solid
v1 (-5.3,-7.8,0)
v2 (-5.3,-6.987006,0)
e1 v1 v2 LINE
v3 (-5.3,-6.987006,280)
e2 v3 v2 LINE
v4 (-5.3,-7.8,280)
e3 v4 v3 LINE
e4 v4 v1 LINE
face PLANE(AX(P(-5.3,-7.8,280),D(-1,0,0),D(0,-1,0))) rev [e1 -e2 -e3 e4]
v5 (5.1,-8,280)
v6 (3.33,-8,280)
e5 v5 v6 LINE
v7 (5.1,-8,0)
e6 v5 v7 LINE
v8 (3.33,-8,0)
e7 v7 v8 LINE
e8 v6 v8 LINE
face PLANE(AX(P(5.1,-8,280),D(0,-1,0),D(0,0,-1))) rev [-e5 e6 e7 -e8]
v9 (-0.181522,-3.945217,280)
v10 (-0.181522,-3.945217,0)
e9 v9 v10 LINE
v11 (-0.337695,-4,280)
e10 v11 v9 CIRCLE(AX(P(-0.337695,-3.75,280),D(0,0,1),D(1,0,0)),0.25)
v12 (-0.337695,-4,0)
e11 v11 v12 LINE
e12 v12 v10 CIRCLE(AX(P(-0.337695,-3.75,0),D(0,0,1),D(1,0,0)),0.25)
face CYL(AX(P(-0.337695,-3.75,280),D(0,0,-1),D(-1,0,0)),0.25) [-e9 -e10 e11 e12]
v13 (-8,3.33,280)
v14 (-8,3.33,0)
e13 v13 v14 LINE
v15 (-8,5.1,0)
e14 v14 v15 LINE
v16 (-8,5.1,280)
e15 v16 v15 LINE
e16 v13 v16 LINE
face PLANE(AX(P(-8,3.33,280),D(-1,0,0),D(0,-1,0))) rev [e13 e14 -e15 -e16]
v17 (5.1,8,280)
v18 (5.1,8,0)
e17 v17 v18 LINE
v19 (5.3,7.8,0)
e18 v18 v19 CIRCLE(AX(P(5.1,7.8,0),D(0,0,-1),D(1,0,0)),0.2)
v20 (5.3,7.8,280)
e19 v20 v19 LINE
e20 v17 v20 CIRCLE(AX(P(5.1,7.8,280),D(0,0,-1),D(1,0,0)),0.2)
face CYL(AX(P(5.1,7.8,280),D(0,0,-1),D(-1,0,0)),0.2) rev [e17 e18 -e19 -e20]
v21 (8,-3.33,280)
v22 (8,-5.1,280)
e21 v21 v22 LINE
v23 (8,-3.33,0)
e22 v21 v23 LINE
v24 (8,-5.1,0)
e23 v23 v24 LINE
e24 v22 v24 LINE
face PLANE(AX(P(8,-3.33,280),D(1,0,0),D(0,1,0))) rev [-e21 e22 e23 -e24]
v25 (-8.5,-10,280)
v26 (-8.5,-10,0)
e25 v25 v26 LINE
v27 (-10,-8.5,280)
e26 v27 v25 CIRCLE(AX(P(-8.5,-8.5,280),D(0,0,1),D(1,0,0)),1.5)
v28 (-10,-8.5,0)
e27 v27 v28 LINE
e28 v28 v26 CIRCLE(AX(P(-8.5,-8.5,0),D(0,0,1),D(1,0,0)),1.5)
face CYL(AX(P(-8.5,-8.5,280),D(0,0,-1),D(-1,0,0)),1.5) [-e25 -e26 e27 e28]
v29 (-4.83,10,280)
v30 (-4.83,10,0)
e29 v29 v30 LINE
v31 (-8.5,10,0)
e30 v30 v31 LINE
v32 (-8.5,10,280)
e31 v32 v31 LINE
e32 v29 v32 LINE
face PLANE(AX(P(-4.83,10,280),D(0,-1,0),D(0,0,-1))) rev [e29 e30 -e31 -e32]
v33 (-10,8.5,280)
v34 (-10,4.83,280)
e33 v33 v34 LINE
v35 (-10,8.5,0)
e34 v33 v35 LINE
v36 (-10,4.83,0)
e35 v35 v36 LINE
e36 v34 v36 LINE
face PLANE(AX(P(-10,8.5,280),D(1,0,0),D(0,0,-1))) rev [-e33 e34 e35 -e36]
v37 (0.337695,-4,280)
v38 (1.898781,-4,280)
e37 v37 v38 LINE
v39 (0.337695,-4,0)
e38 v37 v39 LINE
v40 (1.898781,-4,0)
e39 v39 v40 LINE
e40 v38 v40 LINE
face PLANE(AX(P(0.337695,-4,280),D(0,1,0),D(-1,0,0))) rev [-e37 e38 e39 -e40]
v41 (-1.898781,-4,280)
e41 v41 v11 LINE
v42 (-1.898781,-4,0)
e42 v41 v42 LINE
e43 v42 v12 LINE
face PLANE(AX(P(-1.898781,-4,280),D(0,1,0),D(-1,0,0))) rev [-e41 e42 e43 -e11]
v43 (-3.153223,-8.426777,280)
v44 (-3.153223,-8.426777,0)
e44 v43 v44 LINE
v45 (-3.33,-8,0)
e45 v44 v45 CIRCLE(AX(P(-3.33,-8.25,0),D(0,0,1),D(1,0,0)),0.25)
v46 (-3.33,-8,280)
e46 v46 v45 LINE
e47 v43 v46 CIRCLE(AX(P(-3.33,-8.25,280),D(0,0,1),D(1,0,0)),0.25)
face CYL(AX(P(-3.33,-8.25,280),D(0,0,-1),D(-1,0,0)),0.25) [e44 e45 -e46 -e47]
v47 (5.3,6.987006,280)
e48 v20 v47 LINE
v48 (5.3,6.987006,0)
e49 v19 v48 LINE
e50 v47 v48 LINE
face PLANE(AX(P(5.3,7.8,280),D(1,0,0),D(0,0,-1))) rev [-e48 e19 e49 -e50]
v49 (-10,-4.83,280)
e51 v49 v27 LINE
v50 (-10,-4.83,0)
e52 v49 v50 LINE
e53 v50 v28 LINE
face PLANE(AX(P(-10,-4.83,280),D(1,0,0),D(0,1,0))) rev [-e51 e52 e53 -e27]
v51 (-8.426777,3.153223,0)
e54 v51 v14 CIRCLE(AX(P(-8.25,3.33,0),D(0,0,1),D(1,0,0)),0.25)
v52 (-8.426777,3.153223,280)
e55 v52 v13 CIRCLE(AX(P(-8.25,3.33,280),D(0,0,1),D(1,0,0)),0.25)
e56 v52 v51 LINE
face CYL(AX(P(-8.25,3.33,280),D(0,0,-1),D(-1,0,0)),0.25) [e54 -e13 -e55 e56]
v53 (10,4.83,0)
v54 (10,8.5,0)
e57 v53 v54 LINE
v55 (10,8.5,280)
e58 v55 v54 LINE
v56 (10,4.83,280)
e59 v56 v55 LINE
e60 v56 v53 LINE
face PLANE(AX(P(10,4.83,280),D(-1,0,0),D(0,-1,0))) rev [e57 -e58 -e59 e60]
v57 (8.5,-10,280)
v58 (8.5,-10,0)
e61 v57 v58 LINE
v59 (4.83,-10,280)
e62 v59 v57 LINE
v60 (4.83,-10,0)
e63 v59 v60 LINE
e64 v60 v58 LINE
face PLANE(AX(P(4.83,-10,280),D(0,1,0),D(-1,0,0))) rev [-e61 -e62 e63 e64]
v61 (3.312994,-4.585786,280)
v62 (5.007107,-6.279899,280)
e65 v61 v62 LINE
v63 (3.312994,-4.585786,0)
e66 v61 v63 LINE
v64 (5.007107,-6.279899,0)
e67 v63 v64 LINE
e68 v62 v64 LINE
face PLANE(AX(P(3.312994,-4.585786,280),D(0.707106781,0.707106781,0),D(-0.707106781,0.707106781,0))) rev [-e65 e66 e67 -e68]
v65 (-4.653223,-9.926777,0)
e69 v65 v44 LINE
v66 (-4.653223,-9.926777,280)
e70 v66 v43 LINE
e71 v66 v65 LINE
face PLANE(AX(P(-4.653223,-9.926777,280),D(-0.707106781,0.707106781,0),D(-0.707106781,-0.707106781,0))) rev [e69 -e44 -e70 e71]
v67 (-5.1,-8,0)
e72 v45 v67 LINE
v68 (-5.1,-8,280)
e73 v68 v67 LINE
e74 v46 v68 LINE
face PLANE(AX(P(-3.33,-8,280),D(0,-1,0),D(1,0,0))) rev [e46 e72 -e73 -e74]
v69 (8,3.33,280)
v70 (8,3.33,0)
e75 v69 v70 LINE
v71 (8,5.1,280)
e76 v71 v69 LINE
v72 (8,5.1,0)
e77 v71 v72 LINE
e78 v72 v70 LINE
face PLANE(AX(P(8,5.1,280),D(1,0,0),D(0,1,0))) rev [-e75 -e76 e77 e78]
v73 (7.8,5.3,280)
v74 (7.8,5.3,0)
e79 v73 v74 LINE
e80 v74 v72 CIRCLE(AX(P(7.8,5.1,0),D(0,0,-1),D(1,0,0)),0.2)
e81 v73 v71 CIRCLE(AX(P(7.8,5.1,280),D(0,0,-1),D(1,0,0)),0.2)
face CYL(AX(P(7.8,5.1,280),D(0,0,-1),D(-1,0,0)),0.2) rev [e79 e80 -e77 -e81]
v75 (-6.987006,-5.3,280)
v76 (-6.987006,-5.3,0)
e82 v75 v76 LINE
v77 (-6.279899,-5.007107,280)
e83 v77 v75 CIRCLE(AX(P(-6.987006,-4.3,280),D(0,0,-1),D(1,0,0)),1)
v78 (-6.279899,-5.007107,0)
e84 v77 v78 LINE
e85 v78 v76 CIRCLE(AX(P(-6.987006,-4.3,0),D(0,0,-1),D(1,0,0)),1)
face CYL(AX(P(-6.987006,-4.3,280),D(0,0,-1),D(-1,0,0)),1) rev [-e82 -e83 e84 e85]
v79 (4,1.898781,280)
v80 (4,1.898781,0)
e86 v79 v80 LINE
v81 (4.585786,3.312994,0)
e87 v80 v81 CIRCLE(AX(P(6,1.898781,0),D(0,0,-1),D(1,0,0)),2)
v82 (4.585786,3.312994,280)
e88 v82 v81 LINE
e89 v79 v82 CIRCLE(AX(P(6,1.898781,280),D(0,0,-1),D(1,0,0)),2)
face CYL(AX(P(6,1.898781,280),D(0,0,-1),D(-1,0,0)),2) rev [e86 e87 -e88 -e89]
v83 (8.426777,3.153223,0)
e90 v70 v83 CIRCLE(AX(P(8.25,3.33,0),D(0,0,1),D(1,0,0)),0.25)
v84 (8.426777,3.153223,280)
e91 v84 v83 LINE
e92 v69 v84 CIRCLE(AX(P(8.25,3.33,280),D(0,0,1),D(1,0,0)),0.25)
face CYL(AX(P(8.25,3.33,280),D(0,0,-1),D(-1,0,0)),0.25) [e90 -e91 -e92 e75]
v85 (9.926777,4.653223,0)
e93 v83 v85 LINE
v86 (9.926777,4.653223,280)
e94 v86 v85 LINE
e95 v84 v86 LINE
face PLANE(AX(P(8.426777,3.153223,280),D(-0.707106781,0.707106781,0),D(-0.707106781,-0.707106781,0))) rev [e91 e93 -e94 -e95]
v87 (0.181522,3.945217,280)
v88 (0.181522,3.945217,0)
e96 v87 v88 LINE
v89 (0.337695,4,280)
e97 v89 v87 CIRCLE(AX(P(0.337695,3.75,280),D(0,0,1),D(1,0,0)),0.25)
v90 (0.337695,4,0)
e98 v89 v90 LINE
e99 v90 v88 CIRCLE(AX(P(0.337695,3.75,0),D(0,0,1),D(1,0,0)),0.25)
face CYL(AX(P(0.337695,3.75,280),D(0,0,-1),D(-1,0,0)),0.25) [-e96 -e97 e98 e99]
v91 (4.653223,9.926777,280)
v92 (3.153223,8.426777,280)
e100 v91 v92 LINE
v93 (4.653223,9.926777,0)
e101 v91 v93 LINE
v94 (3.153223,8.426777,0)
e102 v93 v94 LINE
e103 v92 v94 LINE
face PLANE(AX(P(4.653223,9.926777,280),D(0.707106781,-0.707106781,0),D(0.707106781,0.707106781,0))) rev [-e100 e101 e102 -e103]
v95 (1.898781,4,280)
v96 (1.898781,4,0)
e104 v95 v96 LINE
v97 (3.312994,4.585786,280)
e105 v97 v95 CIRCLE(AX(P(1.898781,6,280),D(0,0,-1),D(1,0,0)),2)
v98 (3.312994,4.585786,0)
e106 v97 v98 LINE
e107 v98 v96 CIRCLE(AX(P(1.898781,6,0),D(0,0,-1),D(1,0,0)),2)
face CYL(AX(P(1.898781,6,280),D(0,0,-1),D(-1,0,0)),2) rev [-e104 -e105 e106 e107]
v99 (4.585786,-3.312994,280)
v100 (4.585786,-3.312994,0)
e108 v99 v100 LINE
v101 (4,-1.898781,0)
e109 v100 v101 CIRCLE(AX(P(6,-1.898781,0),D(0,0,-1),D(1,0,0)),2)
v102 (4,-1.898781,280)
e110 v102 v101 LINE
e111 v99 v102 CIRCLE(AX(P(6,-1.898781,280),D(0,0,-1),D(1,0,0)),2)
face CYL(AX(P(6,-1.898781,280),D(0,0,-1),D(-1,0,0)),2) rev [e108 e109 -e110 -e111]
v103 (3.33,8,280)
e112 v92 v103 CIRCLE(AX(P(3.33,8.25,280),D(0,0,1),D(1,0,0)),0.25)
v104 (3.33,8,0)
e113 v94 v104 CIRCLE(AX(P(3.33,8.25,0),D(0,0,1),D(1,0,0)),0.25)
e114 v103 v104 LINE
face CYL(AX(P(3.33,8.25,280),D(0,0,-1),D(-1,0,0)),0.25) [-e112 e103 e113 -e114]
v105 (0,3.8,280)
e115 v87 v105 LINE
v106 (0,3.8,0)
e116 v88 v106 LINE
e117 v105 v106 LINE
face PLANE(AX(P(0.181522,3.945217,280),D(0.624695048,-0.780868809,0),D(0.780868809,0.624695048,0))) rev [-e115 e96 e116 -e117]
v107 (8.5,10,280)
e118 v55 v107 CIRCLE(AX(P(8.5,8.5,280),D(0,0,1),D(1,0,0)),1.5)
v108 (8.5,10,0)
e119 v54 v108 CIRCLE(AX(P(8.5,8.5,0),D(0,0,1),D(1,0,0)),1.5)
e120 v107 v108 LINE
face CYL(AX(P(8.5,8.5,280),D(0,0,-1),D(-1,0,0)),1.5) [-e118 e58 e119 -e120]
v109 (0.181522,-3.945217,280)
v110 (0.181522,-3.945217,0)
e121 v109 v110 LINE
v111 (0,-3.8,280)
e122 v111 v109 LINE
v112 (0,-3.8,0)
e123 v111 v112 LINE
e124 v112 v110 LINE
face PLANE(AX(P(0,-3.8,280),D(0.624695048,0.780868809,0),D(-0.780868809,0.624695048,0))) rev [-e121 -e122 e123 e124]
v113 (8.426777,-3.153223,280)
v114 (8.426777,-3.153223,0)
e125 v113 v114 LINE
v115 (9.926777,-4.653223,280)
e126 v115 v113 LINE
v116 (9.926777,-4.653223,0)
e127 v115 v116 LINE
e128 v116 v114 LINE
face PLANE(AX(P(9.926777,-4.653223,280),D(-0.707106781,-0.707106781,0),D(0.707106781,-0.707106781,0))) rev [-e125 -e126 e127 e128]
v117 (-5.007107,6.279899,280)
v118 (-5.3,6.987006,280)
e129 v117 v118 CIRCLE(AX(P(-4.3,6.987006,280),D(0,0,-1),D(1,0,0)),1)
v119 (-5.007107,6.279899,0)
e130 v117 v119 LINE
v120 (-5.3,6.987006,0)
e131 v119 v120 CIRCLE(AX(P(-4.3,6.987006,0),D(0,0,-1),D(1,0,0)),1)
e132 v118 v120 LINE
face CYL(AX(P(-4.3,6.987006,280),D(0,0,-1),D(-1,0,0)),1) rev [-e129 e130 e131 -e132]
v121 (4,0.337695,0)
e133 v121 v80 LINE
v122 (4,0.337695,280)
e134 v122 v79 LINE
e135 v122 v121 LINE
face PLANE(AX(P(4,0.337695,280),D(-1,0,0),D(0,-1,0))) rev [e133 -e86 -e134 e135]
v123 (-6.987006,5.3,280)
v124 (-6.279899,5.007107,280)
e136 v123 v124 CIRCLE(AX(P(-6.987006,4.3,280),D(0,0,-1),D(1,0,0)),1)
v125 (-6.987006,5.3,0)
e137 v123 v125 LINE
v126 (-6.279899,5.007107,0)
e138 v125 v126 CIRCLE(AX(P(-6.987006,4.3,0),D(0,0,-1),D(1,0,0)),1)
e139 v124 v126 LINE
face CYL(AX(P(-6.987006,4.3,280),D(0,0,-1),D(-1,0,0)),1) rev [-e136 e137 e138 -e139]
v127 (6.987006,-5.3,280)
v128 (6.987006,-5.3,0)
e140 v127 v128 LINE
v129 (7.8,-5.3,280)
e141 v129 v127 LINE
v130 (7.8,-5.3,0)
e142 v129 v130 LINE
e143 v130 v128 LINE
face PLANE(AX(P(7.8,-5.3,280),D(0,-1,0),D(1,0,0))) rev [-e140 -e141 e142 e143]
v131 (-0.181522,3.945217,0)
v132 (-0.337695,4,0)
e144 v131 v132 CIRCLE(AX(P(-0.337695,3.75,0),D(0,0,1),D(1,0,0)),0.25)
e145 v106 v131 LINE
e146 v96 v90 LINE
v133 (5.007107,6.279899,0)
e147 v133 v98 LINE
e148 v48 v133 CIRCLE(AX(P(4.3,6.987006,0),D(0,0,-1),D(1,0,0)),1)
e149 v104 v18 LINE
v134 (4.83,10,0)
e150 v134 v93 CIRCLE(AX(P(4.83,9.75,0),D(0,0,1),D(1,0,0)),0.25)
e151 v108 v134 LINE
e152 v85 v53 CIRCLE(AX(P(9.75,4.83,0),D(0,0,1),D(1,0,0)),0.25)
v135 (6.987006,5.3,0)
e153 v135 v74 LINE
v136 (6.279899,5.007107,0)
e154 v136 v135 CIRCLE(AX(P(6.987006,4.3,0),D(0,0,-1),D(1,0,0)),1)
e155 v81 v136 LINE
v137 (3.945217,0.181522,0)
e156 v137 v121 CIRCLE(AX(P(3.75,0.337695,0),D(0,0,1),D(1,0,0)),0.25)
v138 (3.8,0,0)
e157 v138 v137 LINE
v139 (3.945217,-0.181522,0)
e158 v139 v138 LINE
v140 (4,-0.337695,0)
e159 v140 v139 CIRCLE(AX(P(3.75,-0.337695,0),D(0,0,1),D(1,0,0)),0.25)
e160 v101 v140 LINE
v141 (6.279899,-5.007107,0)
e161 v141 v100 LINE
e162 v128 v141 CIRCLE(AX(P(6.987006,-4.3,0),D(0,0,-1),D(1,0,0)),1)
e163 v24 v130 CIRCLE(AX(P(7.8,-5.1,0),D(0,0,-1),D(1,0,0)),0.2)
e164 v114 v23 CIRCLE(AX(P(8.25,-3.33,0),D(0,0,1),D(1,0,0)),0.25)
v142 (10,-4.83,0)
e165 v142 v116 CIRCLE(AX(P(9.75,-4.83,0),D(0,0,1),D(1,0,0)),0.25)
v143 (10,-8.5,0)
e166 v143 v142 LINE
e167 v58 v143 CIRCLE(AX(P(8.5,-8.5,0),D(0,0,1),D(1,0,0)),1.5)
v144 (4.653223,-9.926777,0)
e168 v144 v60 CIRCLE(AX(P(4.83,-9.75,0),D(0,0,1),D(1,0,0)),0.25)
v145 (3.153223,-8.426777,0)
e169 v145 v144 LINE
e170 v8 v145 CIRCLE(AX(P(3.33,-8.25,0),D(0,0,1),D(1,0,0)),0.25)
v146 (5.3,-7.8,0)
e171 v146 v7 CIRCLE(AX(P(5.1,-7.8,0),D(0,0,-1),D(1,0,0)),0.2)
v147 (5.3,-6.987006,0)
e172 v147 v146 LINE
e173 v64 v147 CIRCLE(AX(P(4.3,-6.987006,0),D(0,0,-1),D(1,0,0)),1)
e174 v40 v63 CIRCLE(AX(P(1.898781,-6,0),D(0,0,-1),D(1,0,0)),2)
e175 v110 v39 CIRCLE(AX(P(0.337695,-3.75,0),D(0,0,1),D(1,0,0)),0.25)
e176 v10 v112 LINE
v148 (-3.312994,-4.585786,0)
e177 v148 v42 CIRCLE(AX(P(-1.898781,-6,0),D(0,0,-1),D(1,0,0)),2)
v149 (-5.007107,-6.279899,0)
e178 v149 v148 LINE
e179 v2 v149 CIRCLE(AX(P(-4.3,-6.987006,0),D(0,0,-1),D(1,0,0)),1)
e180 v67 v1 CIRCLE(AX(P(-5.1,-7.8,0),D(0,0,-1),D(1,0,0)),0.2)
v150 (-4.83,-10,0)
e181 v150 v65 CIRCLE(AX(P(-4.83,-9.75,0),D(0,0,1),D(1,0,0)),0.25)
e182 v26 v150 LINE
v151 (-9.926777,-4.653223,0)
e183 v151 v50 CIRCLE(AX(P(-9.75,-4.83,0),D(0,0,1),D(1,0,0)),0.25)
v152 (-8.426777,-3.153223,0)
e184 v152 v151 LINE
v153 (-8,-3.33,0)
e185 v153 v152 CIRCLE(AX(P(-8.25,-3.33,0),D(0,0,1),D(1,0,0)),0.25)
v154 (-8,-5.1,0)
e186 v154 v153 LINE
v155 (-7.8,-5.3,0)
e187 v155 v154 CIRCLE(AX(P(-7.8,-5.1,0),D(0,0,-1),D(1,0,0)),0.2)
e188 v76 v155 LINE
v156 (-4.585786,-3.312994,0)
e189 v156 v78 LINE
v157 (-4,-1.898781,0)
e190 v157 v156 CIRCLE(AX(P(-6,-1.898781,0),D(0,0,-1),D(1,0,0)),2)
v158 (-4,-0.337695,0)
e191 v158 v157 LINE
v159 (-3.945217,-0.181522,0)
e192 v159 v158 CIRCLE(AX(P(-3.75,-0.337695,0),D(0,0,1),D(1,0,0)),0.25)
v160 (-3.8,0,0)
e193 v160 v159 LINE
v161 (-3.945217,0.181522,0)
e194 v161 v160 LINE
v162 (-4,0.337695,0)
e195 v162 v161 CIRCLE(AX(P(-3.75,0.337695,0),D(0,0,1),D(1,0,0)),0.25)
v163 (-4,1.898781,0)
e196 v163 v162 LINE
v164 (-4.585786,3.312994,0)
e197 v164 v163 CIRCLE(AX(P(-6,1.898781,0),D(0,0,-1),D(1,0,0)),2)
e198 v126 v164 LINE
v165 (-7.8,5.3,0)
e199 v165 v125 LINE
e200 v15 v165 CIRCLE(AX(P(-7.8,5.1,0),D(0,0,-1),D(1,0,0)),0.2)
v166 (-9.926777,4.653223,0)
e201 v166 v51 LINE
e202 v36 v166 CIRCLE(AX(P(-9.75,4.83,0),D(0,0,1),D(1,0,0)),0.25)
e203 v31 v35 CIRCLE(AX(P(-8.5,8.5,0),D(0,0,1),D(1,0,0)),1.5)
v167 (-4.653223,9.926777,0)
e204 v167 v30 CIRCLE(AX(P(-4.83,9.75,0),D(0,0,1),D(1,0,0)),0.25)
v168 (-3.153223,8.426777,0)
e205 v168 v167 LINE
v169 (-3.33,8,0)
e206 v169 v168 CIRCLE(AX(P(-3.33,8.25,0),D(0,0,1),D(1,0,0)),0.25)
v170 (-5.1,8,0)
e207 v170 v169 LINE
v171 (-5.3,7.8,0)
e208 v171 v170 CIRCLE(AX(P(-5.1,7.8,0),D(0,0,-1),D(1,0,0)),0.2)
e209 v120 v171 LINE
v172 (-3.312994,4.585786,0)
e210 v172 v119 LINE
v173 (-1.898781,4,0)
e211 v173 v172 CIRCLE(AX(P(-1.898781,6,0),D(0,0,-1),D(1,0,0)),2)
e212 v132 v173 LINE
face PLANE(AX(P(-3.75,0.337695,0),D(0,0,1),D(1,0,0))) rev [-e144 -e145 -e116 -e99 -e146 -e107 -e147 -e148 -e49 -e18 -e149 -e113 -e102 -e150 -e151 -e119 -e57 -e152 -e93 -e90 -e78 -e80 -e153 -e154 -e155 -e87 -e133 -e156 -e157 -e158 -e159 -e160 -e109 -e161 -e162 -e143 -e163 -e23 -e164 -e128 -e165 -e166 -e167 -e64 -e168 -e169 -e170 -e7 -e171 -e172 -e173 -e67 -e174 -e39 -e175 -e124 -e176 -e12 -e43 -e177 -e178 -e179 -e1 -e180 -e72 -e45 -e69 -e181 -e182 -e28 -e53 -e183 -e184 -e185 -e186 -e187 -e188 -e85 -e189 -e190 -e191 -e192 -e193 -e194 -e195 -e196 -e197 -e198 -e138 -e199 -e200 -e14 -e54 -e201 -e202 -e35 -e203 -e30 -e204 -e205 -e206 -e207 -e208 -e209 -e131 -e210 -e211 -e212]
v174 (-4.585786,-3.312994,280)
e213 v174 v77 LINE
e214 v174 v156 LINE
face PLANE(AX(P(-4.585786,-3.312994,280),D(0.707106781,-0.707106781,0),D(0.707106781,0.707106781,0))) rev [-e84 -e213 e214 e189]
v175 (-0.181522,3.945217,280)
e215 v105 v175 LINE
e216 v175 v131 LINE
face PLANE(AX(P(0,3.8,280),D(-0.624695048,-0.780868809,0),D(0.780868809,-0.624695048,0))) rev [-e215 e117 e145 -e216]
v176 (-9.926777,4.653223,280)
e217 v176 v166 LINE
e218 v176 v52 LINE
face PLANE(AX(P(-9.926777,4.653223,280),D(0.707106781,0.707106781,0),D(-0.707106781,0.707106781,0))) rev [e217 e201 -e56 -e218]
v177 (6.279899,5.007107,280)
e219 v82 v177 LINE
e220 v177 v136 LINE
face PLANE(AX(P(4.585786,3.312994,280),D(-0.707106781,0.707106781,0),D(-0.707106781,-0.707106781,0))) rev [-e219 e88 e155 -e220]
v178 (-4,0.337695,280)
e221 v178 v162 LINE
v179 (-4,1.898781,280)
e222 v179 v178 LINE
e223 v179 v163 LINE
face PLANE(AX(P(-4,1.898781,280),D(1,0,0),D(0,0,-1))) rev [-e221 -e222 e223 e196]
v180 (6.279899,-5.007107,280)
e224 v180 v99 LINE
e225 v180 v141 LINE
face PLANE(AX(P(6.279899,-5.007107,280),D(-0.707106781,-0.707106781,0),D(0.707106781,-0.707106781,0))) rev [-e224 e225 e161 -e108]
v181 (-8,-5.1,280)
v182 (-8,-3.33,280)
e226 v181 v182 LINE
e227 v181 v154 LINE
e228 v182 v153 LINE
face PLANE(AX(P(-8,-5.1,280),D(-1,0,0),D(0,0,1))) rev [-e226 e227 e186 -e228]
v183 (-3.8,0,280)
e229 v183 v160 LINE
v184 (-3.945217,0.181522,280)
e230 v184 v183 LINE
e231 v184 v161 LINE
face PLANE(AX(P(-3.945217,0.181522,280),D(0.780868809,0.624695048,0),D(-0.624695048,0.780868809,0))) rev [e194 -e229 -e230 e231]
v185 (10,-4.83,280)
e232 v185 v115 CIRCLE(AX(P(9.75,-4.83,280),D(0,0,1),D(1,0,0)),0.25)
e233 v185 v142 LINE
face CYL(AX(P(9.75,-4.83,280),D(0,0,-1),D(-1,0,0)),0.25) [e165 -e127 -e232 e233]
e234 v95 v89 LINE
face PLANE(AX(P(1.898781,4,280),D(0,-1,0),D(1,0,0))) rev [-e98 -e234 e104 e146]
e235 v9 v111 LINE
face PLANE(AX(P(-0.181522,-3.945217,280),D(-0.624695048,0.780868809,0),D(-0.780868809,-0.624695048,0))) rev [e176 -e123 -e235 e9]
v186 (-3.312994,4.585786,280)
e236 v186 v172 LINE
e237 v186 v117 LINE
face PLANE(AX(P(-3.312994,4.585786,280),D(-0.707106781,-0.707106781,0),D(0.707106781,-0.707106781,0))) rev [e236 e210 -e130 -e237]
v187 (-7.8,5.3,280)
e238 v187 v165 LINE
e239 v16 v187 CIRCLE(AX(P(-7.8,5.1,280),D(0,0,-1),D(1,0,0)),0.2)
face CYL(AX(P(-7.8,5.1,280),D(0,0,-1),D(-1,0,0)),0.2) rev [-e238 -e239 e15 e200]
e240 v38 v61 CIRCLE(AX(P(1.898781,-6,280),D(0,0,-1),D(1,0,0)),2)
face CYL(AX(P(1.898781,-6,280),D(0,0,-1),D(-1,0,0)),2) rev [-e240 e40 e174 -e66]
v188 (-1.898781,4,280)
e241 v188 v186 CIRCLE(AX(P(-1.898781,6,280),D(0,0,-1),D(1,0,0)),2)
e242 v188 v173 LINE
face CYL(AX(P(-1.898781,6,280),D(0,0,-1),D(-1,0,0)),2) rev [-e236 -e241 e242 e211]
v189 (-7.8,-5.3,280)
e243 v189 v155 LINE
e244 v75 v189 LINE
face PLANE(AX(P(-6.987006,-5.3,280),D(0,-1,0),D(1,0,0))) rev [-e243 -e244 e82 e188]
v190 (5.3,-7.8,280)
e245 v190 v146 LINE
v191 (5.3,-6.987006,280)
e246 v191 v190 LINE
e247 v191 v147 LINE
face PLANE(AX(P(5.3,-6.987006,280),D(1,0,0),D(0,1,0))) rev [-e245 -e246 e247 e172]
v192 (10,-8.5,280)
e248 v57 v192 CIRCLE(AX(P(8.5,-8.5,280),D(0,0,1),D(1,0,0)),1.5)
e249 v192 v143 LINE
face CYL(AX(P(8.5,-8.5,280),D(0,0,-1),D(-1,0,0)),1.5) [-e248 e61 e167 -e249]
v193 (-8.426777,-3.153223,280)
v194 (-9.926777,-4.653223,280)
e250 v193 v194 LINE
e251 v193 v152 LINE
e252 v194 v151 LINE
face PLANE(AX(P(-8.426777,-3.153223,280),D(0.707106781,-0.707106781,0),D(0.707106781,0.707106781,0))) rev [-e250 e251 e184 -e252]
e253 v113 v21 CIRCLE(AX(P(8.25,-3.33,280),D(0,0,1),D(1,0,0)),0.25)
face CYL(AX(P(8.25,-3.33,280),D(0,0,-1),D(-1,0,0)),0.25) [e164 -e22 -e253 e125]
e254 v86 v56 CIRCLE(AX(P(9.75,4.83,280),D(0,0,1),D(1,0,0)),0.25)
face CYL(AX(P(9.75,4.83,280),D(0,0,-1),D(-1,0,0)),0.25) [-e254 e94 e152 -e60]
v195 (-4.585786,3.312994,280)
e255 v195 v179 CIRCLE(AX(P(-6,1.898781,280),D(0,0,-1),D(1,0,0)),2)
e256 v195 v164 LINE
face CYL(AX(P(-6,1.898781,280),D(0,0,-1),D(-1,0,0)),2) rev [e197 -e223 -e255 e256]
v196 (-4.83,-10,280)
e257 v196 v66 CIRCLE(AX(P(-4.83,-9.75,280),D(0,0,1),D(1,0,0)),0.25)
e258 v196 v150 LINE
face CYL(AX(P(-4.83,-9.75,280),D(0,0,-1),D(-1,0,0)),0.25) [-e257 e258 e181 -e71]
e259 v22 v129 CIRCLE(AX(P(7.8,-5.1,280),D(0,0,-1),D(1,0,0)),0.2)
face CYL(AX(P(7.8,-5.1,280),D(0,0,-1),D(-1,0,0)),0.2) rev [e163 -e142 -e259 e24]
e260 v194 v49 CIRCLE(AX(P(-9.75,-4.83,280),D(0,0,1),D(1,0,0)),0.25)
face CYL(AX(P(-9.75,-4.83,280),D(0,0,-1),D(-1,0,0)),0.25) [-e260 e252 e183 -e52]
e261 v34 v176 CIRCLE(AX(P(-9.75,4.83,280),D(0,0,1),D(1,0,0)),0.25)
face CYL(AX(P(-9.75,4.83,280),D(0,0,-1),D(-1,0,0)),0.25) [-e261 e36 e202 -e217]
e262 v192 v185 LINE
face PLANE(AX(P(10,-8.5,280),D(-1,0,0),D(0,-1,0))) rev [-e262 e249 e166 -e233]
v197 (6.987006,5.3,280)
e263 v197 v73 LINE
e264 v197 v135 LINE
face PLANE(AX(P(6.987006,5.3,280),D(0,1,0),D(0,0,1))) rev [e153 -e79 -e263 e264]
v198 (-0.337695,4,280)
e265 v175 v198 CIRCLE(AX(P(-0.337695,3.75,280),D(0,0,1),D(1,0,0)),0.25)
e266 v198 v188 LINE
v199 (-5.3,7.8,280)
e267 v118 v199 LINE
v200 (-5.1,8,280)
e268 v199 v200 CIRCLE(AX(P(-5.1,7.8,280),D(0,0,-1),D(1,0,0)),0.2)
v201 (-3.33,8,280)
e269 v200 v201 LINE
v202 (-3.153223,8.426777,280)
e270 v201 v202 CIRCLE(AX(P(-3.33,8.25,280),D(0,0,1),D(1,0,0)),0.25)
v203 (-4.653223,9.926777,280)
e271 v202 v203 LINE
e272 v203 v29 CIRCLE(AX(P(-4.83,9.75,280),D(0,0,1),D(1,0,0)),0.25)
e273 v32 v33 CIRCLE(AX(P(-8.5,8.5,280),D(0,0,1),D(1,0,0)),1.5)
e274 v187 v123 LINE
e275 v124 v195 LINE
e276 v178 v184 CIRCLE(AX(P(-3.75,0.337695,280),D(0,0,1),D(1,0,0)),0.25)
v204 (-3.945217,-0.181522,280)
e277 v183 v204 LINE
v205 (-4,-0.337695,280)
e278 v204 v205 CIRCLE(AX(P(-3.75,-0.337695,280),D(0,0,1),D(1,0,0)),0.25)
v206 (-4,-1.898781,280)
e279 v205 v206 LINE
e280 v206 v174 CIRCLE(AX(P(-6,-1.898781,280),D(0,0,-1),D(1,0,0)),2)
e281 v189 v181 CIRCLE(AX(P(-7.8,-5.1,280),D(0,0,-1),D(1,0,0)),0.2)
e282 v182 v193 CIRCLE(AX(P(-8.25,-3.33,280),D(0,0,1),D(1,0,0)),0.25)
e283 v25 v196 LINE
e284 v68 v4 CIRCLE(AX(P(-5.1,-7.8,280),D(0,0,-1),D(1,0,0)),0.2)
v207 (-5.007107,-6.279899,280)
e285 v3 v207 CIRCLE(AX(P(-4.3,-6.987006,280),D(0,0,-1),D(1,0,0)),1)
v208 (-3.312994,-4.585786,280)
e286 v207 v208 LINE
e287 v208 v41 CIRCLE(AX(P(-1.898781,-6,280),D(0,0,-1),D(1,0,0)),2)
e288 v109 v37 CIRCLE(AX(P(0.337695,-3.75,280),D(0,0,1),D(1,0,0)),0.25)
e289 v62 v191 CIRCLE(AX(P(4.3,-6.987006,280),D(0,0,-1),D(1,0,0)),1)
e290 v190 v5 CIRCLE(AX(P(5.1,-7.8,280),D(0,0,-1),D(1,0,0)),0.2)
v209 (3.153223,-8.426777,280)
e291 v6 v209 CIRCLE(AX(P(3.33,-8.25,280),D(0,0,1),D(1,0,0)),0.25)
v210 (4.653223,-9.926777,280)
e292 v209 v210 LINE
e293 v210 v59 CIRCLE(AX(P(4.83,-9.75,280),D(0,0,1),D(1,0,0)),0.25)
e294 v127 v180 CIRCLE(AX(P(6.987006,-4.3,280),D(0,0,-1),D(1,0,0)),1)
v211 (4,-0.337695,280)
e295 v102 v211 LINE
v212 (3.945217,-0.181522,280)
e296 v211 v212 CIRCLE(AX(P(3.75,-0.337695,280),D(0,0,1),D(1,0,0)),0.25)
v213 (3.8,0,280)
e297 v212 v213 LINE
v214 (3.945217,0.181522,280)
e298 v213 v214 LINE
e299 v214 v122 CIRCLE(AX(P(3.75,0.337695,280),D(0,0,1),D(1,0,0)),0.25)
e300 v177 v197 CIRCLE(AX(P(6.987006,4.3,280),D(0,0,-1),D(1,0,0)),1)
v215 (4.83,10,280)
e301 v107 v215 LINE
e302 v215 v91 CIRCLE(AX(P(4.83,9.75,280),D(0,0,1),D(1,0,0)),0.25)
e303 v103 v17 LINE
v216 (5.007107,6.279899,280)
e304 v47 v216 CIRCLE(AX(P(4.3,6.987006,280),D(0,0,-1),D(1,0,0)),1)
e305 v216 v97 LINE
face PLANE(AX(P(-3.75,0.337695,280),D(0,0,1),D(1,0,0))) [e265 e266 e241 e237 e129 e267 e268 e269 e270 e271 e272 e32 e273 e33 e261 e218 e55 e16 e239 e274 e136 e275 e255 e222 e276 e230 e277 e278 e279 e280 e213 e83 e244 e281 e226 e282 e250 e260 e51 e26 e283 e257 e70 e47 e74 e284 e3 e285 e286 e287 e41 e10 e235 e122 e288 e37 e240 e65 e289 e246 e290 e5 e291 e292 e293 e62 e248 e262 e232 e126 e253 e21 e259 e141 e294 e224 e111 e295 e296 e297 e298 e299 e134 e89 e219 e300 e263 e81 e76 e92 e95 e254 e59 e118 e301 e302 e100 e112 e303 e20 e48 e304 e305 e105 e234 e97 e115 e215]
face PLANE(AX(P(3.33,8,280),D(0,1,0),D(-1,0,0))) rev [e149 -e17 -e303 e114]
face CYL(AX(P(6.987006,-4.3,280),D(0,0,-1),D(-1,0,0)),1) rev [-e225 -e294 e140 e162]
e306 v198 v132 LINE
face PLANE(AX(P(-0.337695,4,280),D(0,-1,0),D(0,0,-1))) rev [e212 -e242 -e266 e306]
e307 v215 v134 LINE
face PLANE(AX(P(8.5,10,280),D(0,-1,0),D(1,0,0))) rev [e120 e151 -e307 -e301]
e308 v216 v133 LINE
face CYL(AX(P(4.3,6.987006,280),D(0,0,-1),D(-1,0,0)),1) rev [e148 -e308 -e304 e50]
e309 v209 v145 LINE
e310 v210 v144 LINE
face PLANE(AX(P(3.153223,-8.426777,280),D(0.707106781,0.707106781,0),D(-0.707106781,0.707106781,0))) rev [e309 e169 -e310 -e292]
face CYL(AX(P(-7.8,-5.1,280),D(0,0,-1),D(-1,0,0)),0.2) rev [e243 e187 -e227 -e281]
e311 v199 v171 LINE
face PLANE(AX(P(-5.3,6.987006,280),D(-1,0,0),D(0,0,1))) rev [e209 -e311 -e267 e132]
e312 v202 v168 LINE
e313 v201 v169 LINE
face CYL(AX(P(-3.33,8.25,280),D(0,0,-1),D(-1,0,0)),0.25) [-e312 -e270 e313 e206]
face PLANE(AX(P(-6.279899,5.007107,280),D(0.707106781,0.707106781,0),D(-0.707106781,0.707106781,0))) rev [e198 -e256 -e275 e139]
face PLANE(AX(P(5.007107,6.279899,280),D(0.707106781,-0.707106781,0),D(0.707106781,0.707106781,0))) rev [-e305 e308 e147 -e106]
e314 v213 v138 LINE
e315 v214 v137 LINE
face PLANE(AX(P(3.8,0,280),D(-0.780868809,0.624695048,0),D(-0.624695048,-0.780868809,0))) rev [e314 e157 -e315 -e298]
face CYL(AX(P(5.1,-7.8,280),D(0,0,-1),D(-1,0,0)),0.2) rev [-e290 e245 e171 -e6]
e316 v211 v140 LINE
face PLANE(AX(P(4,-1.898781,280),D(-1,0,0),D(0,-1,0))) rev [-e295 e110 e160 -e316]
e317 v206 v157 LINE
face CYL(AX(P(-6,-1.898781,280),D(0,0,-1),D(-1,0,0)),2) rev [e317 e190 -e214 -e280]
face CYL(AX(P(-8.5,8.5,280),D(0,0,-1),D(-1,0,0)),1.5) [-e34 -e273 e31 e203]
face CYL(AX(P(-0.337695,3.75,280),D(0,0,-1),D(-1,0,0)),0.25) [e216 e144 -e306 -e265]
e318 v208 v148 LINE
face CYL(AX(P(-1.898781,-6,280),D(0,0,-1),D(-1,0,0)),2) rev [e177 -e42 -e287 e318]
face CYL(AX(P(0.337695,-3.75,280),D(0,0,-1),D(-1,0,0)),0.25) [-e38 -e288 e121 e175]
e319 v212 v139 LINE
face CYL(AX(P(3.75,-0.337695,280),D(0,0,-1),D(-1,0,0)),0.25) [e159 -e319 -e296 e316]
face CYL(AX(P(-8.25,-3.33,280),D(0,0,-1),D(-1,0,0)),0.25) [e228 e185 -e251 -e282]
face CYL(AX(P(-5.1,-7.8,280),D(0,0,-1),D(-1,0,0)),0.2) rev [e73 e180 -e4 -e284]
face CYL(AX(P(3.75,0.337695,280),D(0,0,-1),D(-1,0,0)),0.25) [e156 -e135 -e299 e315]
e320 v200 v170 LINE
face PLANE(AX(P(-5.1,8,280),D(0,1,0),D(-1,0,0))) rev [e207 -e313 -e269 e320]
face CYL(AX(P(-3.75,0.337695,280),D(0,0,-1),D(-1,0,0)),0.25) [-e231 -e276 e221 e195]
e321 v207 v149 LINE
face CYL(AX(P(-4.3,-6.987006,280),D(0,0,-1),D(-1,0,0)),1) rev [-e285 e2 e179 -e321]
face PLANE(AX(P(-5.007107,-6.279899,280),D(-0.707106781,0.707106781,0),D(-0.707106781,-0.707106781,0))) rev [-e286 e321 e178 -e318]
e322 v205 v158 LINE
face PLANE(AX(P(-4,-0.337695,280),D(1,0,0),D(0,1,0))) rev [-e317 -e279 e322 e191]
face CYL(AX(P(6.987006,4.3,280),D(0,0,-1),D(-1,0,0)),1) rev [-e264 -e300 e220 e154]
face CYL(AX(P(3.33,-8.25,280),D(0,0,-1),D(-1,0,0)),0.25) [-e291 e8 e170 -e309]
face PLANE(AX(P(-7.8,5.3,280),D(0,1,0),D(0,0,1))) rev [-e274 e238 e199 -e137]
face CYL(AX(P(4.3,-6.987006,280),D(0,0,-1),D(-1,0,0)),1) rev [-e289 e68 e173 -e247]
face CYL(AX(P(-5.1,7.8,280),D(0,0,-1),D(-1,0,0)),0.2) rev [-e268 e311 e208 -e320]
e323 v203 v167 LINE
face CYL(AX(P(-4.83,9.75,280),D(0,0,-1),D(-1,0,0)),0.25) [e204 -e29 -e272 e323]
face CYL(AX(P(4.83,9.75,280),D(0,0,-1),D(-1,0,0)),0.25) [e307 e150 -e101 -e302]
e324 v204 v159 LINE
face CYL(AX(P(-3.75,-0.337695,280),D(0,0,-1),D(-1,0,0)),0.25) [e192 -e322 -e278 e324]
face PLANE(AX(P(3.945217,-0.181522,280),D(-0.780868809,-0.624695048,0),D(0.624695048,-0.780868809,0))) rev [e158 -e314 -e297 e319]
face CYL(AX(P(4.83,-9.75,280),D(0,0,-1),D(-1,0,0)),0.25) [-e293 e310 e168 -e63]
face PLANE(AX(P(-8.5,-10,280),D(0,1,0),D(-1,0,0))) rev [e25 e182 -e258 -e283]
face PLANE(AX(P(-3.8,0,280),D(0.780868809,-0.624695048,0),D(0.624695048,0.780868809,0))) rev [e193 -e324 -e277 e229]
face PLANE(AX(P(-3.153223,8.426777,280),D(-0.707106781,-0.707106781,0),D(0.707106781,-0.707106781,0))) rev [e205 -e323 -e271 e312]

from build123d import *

# Parameters (mm, degrees)
EXTRUDE_1_DEPTH = 280


# Read off the part's stored shape, not the designer's step: 222 Конструкционный профиль 20х20-1-surface1
with BuildPart() as part:
    # Эскиз1 → Бобышка-Вытянуть1 (new body)
    with BuildSketch(Plane.XY):
        with BuildLine():
            Line((-3.945217202, 0.181521503), (-3.8, 0))
            Line((-3.8, 0), (-3.945217202, -0.181521503))
            ThreePointArc((-3.945217202, -0.181521503), (-3.98590708, -0.254943529), (-4, -0.337695265))
            Line((-4, -0.337695265), (-4, -1.898780669))
            ThreePointArc((-4, -1.898780669), (-4.152240935, -2.664147534), (-4.585786438, -3.312994231))
            Line((-4.585786438, -3.312994231), (-6.279898987, -5.007106781))
            ThreePointArc((-6.279898987, -5.007106781), (-6.604322336, -5.223879533), (-6.987005769, -5.3))
            Line((-6.987005769, -5.3), (-7.8, -5.3))
            ThreePointArc((-7.8, -5.3), (-7.941421356, -5.241421356), (-8, -5.1))
            Line((-8, -5.1), (-8, -3.33))
            ThreePointArc((-8, -3.33), (-8.154329142, -3.099030117), (-8.426776695, -3.153223305))
            Line((-8.426776695, -3.153223305), (-9.926776695, -4.653223305))
            ThreePointArc((-9.926776695, -4.653223305), (-9.980969883, -4.734329142), (-10, -4.83))
            Line((-10, -4.83), (-10, -8.5))
            ThreePointArc((-10, -8.5), (-9.560660172, -9.560660172), (-8.5, -10))
            Line((-8.5, -10), (-4.83, -10))
            ThreePointArc((-4.83, -10), (-4.734329142, -9.980969883), (-4.653223305, -9.926776695))
            Line((-4.653223305, -9.926776695), (-3.153223305, -8.426776695))
            ThreePointArc((-3.153223305, -8.426776695), (-3.099030117, -8.154329142), (-3.33, -8))
            Line((-3.33, -8), (-5.1, -8))
            ThreePointArc((-5.1, -8), (-5.241421356, -7.941421356), (-5.3, -7.8))
            Line((-5.3, -7.8), (-5.3, -6.987005769))
            ThreePointArc((-5.3, -6.987005769), (-5.223879533, -6.604322336), (-5.007106781, -6.279898987))
            Line((-5.007106781, -6.279898987), (-3.312994231, -4.585786438))
            ThreePointArc((-3.312994231, -4.585786438), (-2.664147534, -4.152240935), (-1.898780669, -4))
            Line((-1.898780669, -4), (-0.337695265, -4))
            ThreePointArc((-0.337695265, -4), (-0.254943529, -3.98590708), (-0.181521503, -3.945217202))
            Line((-0.181521503, -3.945217202), (0, -3.8))
            Line((0, -3.8), (0.181521503, -3.945217202))
            ThreePointArc((0.181521503, -3.945217202), (0.254943529, -3.98590708), (0.337695265, -4))
            Line((0.337695265, -4), (1.898780669, -4))
            ThreePointArc((1.898780669, -4), (2.664147534, -4.152240935), (3.312994231, -4.585786438))
            Line((3.312994231, -4.585786438), (5.007106781, -6.279898987))
            ThreePointArc((5.007106781, -6.279898987), (5.223879533, -6.604322336), (5.3, -6.987005769))
            Line((5.3, -6.987005769), (5.3, -7.8))
            ThreePointArc((5.3, -7.8), (5.241421356, -7.941421356), (5.1, -8))
            Line((5.1, -8), (3.33, -8))
            ThreePointArc((3.33, -8), (3.099030117, -8.154329142), (3.153223305, -8.426776695))
            Line((3.153223305, -8.426776695), (4.653223305, -9.926776695))
            ThreePointArc((4.653223305, -9.926776695), (4.734329142, -9.980969883), (4.83, -10))
            Line((4.83, -10), (8.5, -10))
            ThreePointArc((8.5, -10), (9.560660172, -9.560660172), (10, -8.5))
            Line((10, -8.5), (10, -4.83))
            ThreePointArc((10, -4.83), (9.980969883, -4.734329142), (9.926776695, -4.653223305))
            Line((9.926776695, -4.653223305), (8.426776695, -3.153223305))
            ThreePointArc((8.426776695, -3.153223305), (8.154329142, -3.099030117), (8, -3.33))
            Line((8, -3.33), (8, -5.1))
            ThreePointArc((8, -5.1), (7.941421356, -5.241421356), (7.8, -5.3))
            Line((7.8, -5.3), (6.987005769, -5.3))
            ThreePointArc((6.987005769, -5.3), (6.604322336, -5.223879533), (6.279898987, -5.007106781))
            Line((6.279898987, -5.007106781), (4.585786438, -3.312994231))
            ThreePointArc((4.585786438, -3.312994231), (4.152240935, -2.664147534), (4, -1.898780669))
            Line((4, -1.898780669), (4, -0.337695265))
            ThreePointArc((4, -0.337695265), (3.98590708, -0.254943529), (3.945217202, -0.181521503))
            Line((3.945217202, -0.181521503), (3.8, 0))
            Line((3.8, 0), (3.945217202, 0.181521503))
            ThreePointArc((3.945217202, 0.181521503), (3.98590708, 0.254943529), (4, 0.337695265))
            Line((4, 0.337695265), (4, 1.898780669))
            ThreePointArc((4, 1.898780669), (4.152240935, 2.664147534), (4.585786438, 3.312994231))
            Line((4.585786438, 3.312994231), (6.279898987, 5.007106781))
            ThreePointArc((6.279898987, 5.007106781), (6.604322336, 5.223879533), (6.987005769, 5.3))
            Line((6.987005769, 5.3), (7.8, 5.3))
            ThreePointArc((7.8, 5.3), (7.941421356, 5.241421356), (8, 5.1))
            Line((8, 5.1), (8, 3.33))
            ThreePointArc((8, 3.33), (8.154329142, 3.099030117), (8.426776695, 3.153223305))
            Line((8.426776695, 3.153223305), (9.926776695, 4.653223305))
            ThreePointArc((9.926776695, 4.653223305), (9.980969883, 4.734329142), (10, 4.83))
            Line((10, 4.83), (10, 8.5))
            ThreePointArc((10, 8.5), (9.560660172, 9.560660172), (8.5, 10))
            Line((8.5, 10), (4.83, 10))
            ThreePointArc((4.83, 10), (4.734329142, 9.980969883), (4.653223305, 9.926776695))
            Line((4.653223305, 9.926776695), (3.153223305, 8.426776695))
            ThreePointArc((3.153223305, 8.426776695), (3.099030117, 8.154329142), (3.33, 8))
            Line((3.33, 8), (5.1, 8))
            ThreePointArc((5.1, 8), (5.241421356, 7.941421356), (5.3, 7.8))
            Line((5.3, 7.8), (5.3, 6.987005769))
            ThreePointArc((5.3, 6.987005769), (5.223879533, 6.604322336), (5.007106781, 6.279898987))
            Line((5.007106781, 6.279898987), (3.312994231, 4.585786438))
            ThreePointArc((3.312994231, 4.585786438), (2.664147534, 4.152240935), (1.898780669, 4))
            Line((1.898780669, 4), (0.337695265, 4))
            ThreePointArc((0.337695265, 4), (0.254943529, 3.98590708), (0.181521503, 3.945217202))
            Line((0.181521503, 3.945217202), (0, 3.8))
            Line((0, 3.8), (-0.181521503, 3.945217202))
            ThreePointArc((-0.181521503, 3.945217202), (-0.254943529, 3.98590708), (-0.337695265, 4))
            Line((-0.337695265, 4), (-1.898780669, 4))
            ThreePointArc((-1.898780669, 4), (-2.664147534, 4.152240935), (-3.312994231, 4.585786438))
            Line((-3.312994231, 4.585786438), (-5.007106781, 6.279898987))
            ThreePointArc((-5.007106781, 6.279898987), (-5.223879533, 6.604322336), (-5.3, 6.987005769))
            Line((-5.3, 6.987005769), (-5.3, 7.8))
            ThreePointArc((-5.3, 7.8), (-5.241421356, 7.941421356), (-5.1, 8))
            Line((-5.1, 8), (-3.33, 8))
            ThreePointArc((-3.33, 8), (-3.099030117, 8.154329142), (-3.153223305, 8.426776695))
            Line((-3.153223305, 8.426776695), (-4.653223305, 9.926776695))
            ThreePointArc((-4.653223305, 9.926776695), (-4.734329142, 9.980969883), (-4.83, 10))
            Line((-4.83, 10), (-8.5, 10))
            ThreePointArc((-8.5, 10), (-9.560660172, 9.560660172), (-10, 8.5))
            Line((-10, 8.5), (-10, 4.83))
            ThreePointArc((-10, 4.83), (-9.980969883, 4.734329142), (-9.926776695, 4.653223305))
            Line((-9.926776695, 4.653223305), (-8.426776695, 3.153223305))
            ThreePointArc((-8.426776695, 3.153223305), (-8.154329142, 3.099030117), (-8, 3.33))
            Line((-8, 3.33), (-8, 5.1))
            ThreePointArc((-8, 5.1), (-7.941421356, 5.241421356), (-7.8, 5.3))
            Line((-7.8, 5.3), (-6.987005769, 5.3))
            ThreePointArc((-6.987005769, 5.3), (-6.604322336, 5.223879533), (-6.279898987, 5.007106781))
            Line((-6.279898987, 5.007106781), (-4.585786438, 3.312994231))
            ThreePointArc((-4.585786438, 3.312994231), (-4.152240935, 2.664147534), (-4, 1.898780669))
            Line((-4, 1.898780669), (-4, 0.337695265))
            ThreePointArc((-4, 0.337695265), (-3.98590708, 0.254943529), (-3.945217202, 0.181521503))
        make_face()
    extrude(amount=EXTRUDE_1_DEPTH)


solid = part.part
